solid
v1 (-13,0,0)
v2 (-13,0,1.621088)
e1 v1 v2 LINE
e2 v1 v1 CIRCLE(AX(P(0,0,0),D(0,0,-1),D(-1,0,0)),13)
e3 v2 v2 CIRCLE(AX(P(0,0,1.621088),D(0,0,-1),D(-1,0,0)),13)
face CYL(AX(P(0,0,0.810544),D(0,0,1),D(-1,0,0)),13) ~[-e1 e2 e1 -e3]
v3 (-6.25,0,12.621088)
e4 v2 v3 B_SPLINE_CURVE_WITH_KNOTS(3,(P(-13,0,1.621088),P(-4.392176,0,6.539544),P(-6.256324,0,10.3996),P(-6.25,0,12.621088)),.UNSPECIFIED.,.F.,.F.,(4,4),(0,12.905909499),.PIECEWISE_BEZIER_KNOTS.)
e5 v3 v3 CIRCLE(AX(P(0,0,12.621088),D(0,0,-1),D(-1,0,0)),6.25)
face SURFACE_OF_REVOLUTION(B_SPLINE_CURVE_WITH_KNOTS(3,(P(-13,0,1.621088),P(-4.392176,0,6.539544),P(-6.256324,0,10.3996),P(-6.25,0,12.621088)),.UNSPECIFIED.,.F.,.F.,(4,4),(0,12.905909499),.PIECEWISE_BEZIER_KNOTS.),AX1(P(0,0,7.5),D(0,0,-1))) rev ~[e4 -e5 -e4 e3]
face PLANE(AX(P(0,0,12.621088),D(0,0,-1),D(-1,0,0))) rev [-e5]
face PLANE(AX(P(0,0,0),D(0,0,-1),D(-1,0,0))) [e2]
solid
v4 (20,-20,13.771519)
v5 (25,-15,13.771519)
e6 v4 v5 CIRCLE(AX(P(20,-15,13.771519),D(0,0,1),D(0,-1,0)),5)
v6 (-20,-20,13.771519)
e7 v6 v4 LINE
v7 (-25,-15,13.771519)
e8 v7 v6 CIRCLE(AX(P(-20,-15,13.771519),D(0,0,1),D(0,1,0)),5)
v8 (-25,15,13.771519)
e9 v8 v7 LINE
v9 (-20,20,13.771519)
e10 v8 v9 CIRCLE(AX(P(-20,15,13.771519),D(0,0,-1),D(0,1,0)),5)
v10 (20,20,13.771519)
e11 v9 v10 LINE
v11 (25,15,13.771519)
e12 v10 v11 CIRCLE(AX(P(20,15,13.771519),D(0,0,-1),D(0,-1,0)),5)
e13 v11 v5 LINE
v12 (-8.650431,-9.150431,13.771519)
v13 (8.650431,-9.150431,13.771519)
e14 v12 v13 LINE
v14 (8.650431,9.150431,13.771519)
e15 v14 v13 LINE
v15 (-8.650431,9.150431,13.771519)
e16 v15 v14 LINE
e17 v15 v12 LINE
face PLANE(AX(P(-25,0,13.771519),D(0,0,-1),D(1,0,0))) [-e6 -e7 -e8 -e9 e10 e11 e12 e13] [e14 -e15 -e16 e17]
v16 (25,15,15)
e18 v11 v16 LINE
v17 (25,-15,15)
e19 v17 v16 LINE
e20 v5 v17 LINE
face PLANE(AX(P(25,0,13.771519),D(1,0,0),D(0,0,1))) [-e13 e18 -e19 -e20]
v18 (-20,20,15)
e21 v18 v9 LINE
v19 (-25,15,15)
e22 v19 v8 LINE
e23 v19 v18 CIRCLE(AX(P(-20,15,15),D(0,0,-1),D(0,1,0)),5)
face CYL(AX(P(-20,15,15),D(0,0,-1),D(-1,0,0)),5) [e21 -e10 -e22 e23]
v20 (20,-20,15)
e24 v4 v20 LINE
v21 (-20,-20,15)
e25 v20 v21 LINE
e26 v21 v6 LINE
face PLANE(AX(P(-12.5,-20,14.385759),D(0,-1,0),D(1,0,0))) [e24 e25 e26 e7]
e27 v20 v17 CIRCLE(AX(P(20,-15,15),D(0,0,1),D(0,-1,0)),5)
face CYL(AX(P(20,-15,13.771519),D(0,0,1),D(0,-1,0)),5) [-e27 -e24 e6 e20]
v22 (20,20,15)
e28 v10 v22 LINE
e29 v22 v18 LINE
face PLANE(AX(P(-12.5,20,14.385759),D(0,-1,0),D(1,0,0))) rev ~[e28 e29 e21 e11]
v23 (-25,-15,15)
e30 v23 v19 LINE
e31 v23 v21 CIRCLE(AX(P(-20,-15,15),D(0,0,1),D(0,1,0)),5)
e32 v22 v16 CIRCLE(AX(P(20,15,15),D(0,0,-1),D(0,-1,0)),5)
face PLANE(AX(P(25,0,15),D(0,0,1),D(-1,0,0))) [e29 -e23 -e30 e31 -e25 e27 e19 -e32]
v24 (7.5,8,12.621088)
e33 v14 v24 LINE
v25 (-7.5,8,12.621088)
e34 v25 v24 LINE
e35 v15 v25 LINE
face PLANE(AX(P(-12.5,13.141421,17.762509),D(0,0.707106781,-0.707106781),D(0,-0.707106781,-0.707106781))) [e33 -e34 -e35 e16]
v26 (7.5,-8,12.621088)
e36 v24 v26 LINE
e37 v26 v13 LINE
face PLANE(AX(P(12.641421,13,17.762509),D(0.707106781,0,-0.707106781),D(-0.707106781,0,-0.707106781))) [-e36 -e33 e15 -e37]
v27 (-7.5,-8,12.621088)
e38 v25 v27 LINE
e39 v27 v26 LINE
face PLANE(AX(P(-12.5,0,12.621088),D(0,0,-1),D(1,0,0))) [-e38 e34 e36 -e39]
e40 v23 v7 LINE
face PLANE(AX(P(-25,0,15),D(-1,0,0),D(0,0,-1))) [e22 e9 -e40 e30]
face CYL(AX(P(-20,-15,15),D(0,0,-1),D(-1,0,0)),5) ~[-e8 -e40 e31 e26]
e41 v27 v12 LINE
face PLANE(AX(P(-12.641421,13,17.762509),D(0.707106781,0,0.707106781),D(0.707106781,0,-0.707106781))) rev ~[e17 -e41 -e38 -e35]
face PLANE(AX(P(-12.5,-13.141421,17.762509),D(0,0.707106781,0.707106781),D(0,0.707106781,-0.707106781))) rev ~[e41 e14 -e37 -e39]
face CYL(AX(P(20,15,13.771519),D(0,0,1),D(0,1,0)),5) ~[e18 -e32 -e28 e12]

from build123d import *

# Parameters (mm, degrees)
F1_DEPTH     = 20
F2_DEPTH     = 13
F0_W         = 13
F0_H         = 1.6210880779
F4_T4_DEPTH  = 25
F4_T9_DEPTH  = 26
F4_T14_DEPTH = 26
F4_T19_DEPTH = 25
F4_T25_DEPTH = 38.8584149398
F4_T30_DEPTH = 37.8584149398
F4_T38_DEPTH = 37.8584149398
F4_T43_DEPTH = 38.8584149398
F4_T51_DEPTH = 38.8584149398
F4_T56_DEPTH = 37.8584149398
F4_T64_DEPTH = 38.8584149398
F4_T69_DEPTH = 37.8584149398
F5_R         = 5
F6_R         = 5


# Not quite as in the source:
# - a fillet or chamfer that OpenCascade refuses, or shapes differently, is made with other operations: its cross-section is extruded or revolved along the edge and cut away or added


with BuildPart() as f1:
    # F0 (on Front) → F1 (new body, symmetric)
    with BuildSketch(Plane.XZ):
        Polygon((0, 13.7715186066), (0, 15), (-25, 15), (-25, 13.7715186066), (-12.5, 13.7715186066), align=None)
        Polygon((25, 15), (0, 15), (0, 13.7715186066), (12.5, 13.7715186066), (25, 13.7715186066), align=None)
    extrude(amount=F1_DEPTH, both=True)

    # F0 (on Front) → F2 (join, symmetric)
    with BuildSketch(Plane.XZ):
        Polygon((0, 12.6210880779), (0, 13.7715186066), (-12.5, 13.7715186066), (-12.5, 12.6210880779), (-6.25, 12.6210880779), align=None)
        Polygon((12.5, 13.7715186066), (0, 13.7715186066), (0, 12.6210880779), (6.25, 12.6210880779), (12.5, 12.6210880779), align=None)
    extrude(amount=F2_DEPTH, both=True)

    # F4: chamfer of 5 on 4 edges, made by hand


with BuildPart() as f2:
    # F0 (on Front) → F2, piece 2 (new body, symmetric)
    with BuildSketch(Plane.XZ):
        with Locations((-6.5, 0.810544039)):
            Rectangle(F0_W, F0_H)
        with Locations((6.5, 0.810544039)):
            Rectangle(F0_W, F0_H)
    extrude(amount=F2_DEPTH, both=True)

    # F5
    f5_edges = [f2.edges().sort_by_distance(p)[0] for p in [
        (-13, 13, 0.810544),
        (-13, -13, 0.810544),
        (13, -13, 0.810544),
        (13, 13, 0.810544),
    ]]
    fillet(f5_edges, radius=F5_R)


with BuildPart() as f3:
    # F0 (on Front) → F3 (revolve)
    with BuildSketch(Plane.XZ):
        with BuildLine():
            Line((0, 1.6210880779), (0, 12.6210880779))
            Line((0, 12.6210880779), (-6.25, 12.6210880779))
            add(Edge.make_bspline(
                [(-13, 1.6210880779), (-4.3921764009, 6.5395440906), (-6.2563242824, 10.3996003671), (-6.25, 12.6210880779)],
                knots=[0, 0, 0, 0, 12.9059094991, 12.9059094991, 12.9059094991, 12.9059094991], degree=3))
            Line((-13, 1.6210880779), (0, 1.6210880779))
        make_face()
    revolve(axis=Axis((0, 0, 7.5), (0, 0, -1)))

    # F0 (on Front) → F8 (revolve)
    with BuildSketch(Plane.XZ):
        with Locations((-6.5, 0.810544039)):
            Rectangle(F0_W, F0_H)
    revolve(axis=Axis((0, 0, 0.810544039), (0, 0, -1)))


with BuildPart() as f4_tool2:
    # F4_s3 → F4_t4 (new body)
    with BuildSketch(Plane.YZ.offset(-12.5)):
        with BuildLine():
            Line((13.1414213562, 17.7625094341), (7.8585786438, 12.4796667217))
            Line((7.8585786438, 12.4796667217), (7.8585786438, 12.3796667217))
            ThreePointArc((7.8585786438, 12.3796667217), (10.4292893219, 12.5210880779), (13, 12.5210880779))
            Line((13, 12.5210880779), (13.1, 12.6210880779))
            ThreePointArc((13.1, 12.6210880779), (13.1, 15.191798756), (13.2414213562, 17.7625094341))
            Line((13.2414213562, 17.7625094341), (13.1414213562, 17.7625094341))
        make_face()
    extrude(amount=F4_T4_DEPTH)

    split(bisect_by=Plane.XY.offset(13.7715186066), keep=Keep.BOTTOM)


with BuildPart() as f1_1:
    add(f1.part)

    # F4_t1: cut F4_tool2
    add(f4_tool2.part, mode=Mode.SUBTRACT)


with BuildPart() as f4_tool7:
    # F4_s8 → F4_t9 (new body)
    with BuildSketch(Plane.XZ.offset(-13)):
        with BuildLine():
            Line((-12.6414213562, 17.7625094341), (-7.3585786438, 12.4796667217))
            Line((-7.3585786438, 12.4796667217), (-7.3585786438, 12.3796667217))
            ThreePointArc((-7.3585786438, 12.3796667217), (-9.9292893219, 12.5210880779), (-12.5, 12.5210880779))
            Line((-12.5, 12.5210880779), (-12.6, 12.6210880779))
            ThreePointArc((-12.6, 12.6210880779), (-12.6, 15.191798756), (-12.7414213562, 17.7625094341))
            Line((-12.7414213562, 17.7625094341), (-12.6414213562, 17.7625094341))
        make_face()
    extrude(amount=F4_T9_DEPTH)

    split(bisect_by=Plane.XY.offset(13.7715186066), keep=Keep.BOTTOM)


with BuildPart() as f1_2:
    add(f1_1.part)

    # F4_t6: cut F4_tool7
    add(f4_tool7.part, mode=Mode.SUBTRACT)


with BuildPart() as f4_tool12:
    # F4_s13 → F4_t14 (new body)
    with BuildSketch(Plane.XZ.offset(-13)):
        with BuildLine():
            Line((12.6414213562, 17.7625094341), (7.3585786438, 12.4796667217))
            Line((7.3585786438, 12.4796667217), (7.3585786438, 12.3796667217))
            ThreePointArc((7.3585786438, 12.3796667217), (9.9292893219, 12.5210880779), (12.5, 12.5210880779))
            Line((12.5, 12.5210880779), (12.6, 12.6210880779))
            ThreePointArc((12.6, 12.6210880779), (12.6, 15.191798756), (12.7414213562, 17.7625094341))
            Line((12.7414213562, 17.7625094341), (12.6414213562, 17.7625094341))
        make_face()
    extrude(amount=F4_T14_DEPTH)

    split(bisect_by=Plane.XY.offset(13.7715186066), keep=Keep.BOTTOM)


with BuildPart() as f1_3:
    add(f1_2.part)

    # F4_t11: cut F4_tool12
    add(f4_tool12.part, mode=Mode.SUBTRACT)


with BuildPart() as f4_tool17:
    # F4_s18 → F4_t19 (new body)
    with BuildSketch(Plane.YZ.offset(-12.5)):
        with BuildLine():
            Line((-13.1414213562, 17.7625094341), (-7.8585786438, 12.4796667217))
            Line((-7.8585786438, 12.4796667217), (-7.8585786438, 12.3796667217))
            ThreePointArc((-7.8585786438, 12.3796667217), (-10.4292893219, 12.5210880779), (-13, 12.5210880779))
            Line((-13, 12.5210880779), (-13.1, 12.6210880779))
            ThreePointArc((-13.1, 12.6210880779), (-13.1, 15.191798756), (-13.2414213562, 17.7625094341))
            Line((-13.2414213562, 17.7625094341), (-13.1414213562, 17.7625094341))
        make_face()
    extrude(amount=F4_T19_DEPTH)

    split(bisect_by=Plane.XY.offset(13.7715186066), keep=Keep.BOTTOM)


with BuildPart() as f1_4:
    add(f1_3.part)

    # F4_t16: cut F4_tool17
    add(f4_tool17.part, mode=Mode.SUBTRACT)


with BuildPart() as f4_tool23:
    # F4_s24 → F4_t25 (new body)
    with BuildSketch(Plane.XZ.offset(-25.8584149398)):
        with BuildLine():
            Line((-12.6414213562, 17.7625094341), (-7.3585786438, 12.4796667217))
            Line((-7.3585786438, 12.4796667217), (-7.3585786438, 12.3796667217))
            ThreePointArc((-7.3585786438, 12.3796667217), (-9.9292893219, 12.5210880779), (-12.5, 12.5210880779))
            Line((-12.5, 12.5210880779), (-12.6, 12.6210880779))
            ThreePointArc((-12.6, 12.6210880779), (-12.6, 15.191798756), (-12.7414213562, 17.7625094341))
            Line((-12.7414213562, 17.7625094341), (-12.6414213562, 17.7625094341))
        make_face()
    extrude(amount=F4_T25_DEPTH)

    split(bisect_by=Plane.XY.offset(13.7715186066), keep=Keep.BOTTOM)

    split(bisect_by=Plane.XZ.offset(-13), keep=Keep.BOTTOM)


with BuildPart() as f4_tool28:
    # F4_s29 → F4_t30 (new body)
    with BuildSketch(Plane.YZ.offset(-25.3584149398)):
        with BuildLine():
            Line((13.1414213562, 17.7625094341), (7.8585786438, 12.4796667217))
            Line((7.8585786438, 12.4796667217), (7.8585786438, 12.3796667217))
            ThreePointArc((7.8585786438, 12.3796667217), (10.4292893219, 12.5210880779), (13, 12.5210880779))
            Line((13, 12.5210880779), (13.1, 12.6210880779))
            ThreePointArc((13.1, 12.6210880779), (13.1, 15.191798756), (13.2414213562, 17.7625094341))
            Line((13.2414213562, 17.7625094341), (13.1414213562, 17.7625094341))
        make_face()
    extrude(amount=F4_T30_DEPTH)

    split(bisect_by=Plane.XY.offset(13.7715186066), keep=Keep.BOTTOM)

    split(bisect_by=Plane.YZ.offset(-12.5), keep=Keep.BOTTOM)


with BuildPart() as f4_tool23_1:
    add(f4_tool23.part)

    # F4_t33: intersect F4_tool28
    add(f4_tool28.part, mode=Mode.INTERSECT)


with BuildPart() as f1_5:
    add(f1_4.part)

    # F4_t21: cut F4_tool23
    add(f4_tool23_1.part, mode=Mode.SUBTRACT)


with BuildPart() as f4_tool36:
    # F4_s37 → F4_t38 (new body)
    with BuildSketch(Plane.YZ.offset(-12.5)):
        with BuildLine():
            Line((13.1414213562, 17.7625094341), (7.8585786438, 12.4796667217))
            Line((7.8585786438, 12.4796667217), (7.8585786438, 12.3796667217))
            ThreePointArc((7.8585786438, 12.3796667217), (10.4292893219, 12.5210880779), (13, 12.5210880779))
            Line((13, 12.5210880779), (13.1, 12.6210880779))
            ThreePointArc((13.1, 12.6210880779), (13.1, 15.191798756), (13.2414213562, 17.7625094341))
            Line((13.2414213562, 17.7625094341), (13.1414213562, 17.7625094341))
        make_face()
    extrude(amount=F4_T38_DEPTH)

    split(bisect_by=Plane.XY.offset(13.7715186066), keep=Keep.BOTTOM)

    split(bisect_by=Plane.YZ.offset(12.5), keep=Keep.TOP)


with BuildPart() as f4_tool41:
    # F4_s42 → F4_t43 (new body)
    with BuildSketch(Plane.XZ.offset(-25.8584149398)):
        with BuildLine():
            Line((12.6414213562, 17.7625094341), (7.3585786438, 12.4796667217))
            Line((7.3585786438, 12.4796667217), (7.3585786438, 12.3796667217))
            ThreePointArc((7.3585786438, 12.3796667217), (9.9292893219, 12.5210880779), (12.5, 12.5210880779))
            Line((12.5, 12.5210880779), (12.6, 12.6210880779))
            ThreePointArc((12.6, 12.6210880779), (12.6, 15.191798756), (12.7414213562, 17.7625094341))
            Line((12.7414213562, 17.7625094341), (12.6414213562, 17.7625094341))
        make_face()
    extrude(amount=F4_T43_DEPTH)

    split(bisect_by=Plane.XY.offset(13.7715186066), keep=Keep.BOTTOM)

    split(bisect_by=Plane.XZ.offset(-13), keep=Keep.BOTTOM)


with BuildPart() as f4_tool36_1:
    add(f4_tool36.part)

    # F4_t46: intersect F4_tool41
    add(f4_tool41.part, mode=Mode.INTERSECT)


with BuildPart() as f1_6:
    add(f1_5.part)

    # F4_t34: cut F4_tool36
    add(f4_tool36_1.part, mode=Mode.SUBTRACT)


with BuildPart() as f4_tool49:
    # F4_s50 → F4_t51 (new body)
    with BuildSketch(Plane.XZ.offset(-13)):
        with BuildLine():
            Line((-12.6414213562, 17.7625094341), (-7.3585786438, 12.4796667217))
            Line((-7.3585786438, 12.4796667217), (-7.3585786438, 12.3796667217))
            ThreePointArc((-7.3585786438, 12.3796667217), (-9.9292893219, 12.5210880779), (-12.5, 12.5210880779))
            Line((-12.5, 12.5210880779), (-12.6, 12.6210880779))
            ThreePointArc((-12.6, 12.6210880779), (-12.6, 15.191798756), (-12.7414213562, 17.7625094341))
            Line((-12.7414213562, 17.7625094341), (-12.6414213562, 17.7625094341))
        make_face()
    extrude(amount=F4_T51_DEPTH)

    split(bisect_by=Plane.XY.offset(13.7715186066), keep=Keep.BOTTOM)

    split(bisect_by=Plane.XZ.offset(13), keep=Keep.TOP)


with BuildPart() as f4_tool54:
    # F4_s55 → F4_t56 (new body)
    with BuildSketch(Plane.YZ.offset(-25.3584149398)):
        with BuildLine():
            Line((-13.1414213562, 17.7625094341), (-7.8585786438, 12.4796667217))
            Line((-7.8585786438, 12.4796667217), (-7.8585786438, 12.3796667217))
            ThreePointArc((-7.8585786438, 12.3796667217), (-10.4292893219, 12.5210880779), (-13, 12.5210880779))
            Line((-13, 12.5210880779), (-13.1, 12.6210880779))
            ThreePointArc((-13.1, 12.6210880779), (-13.1, 15.191798756), (-13.2414213562, 17.7625094341))
            Line((-13.2414213562, 17.7625094341), (-13.1414213562, 17.7625094341))
        make_face()
    extrude(amount=F4_T56_DEPTH)

    split(bisect_by=Plane.XY.offset(13.7715186066), keep=Keep.BOTTOM)

    split(bisect_by=Plane.YZ.offset(-12.5), keep=Keep.BOTTOM)


with BuildPart() as f4_tool49_1:
    add(f4_tool49.part)

    # F4_t59: intersect F4_tool54
    add(f4_tool54.part, mode=Mode.INTERSECT)


with BuildPart() as f1_7:
    add(f1_6.part)

    # F4_t47: cut F4_tool49
    add(f4_tool49_1.part, mode=Mode.SUBTRACT)


with BuildPart() as f4_tool62:
    # F4_s63 → F4_t64 (new body)
    with BuildSketch(Plane.XZ.offset(-13)):
        with BuildLine():
            Line((12.6414213562, 17.7625094341), (7.3585786438, 12.4796667217))
            Line((7.3585786438, 12.4796667217), (7.3585786438, 12.3796667217))
            ThreePointArc((7.3585786438, 12.3796667217), (9.9292893219, 12.5210880779), (12.5, 12.5210880779))
            Line((12.5, 12.5210880779), (12.6, 12.6210880779))
            ThreePointArc((12.6, 12.6210880779), (12.6, 15.191798756), (12.7414213562, 17.7625094341))
            Line((12.7414213562, 17.7625094341), (12.6414213562, 17.7625094341))
        make_face()
    extrude(amount=F4_T64_DEPTH)

    split(bisect_by=Plane.XY.offset(13.7715186066), keep=Keep.BOTTOM)

    split(bisect_by=Plane.XZ.offset(13), keep=Keep.TOP)


with BuildPart() as f4_tool67:
    # F4_s68 → F4_t69 (new body)
    with BuildSketch(Plane.YZ.offset(-12.5)):
        with BuildLine():
            Line((-13.1414213562, 17.7625094341), (-7.8585786438, 12.4796667217))
            Line((-7.8585786438, 12.4796667217), (-7.8585786438, 12.3796667217))
            ThreePointArc((-7.8585786438, 12.3796667217), (-10.4292893219, 12.5210880779), (-13, 12.5210880779))
            Line((-13, 12.5210880779), (-13.1, 12.6210880779))
            ThreePointArc((-13.1, 12.6210880779), (-13.1, 15.191798756), (-13.2414213562, 17.7625094341))
            Line((-13.2414213562, 17.7625094341), (-13.1414213562, 17.7625094341))
        make_face()
    extrude(amount=F4_T69_DEPTH)

    split(bisect_by=Plane.XY.offset(13.7715186066), keep=Keep.BOTTOM)

    split(bisect_by=Plane.YZ.offset(12.5), keep=Keep.TOP)


with BuildPart() as f4_tool62_1:
    add(f4_tool62.part)

    # F4_t72: intersect F4_tool67
    add(f4_tool67.part, mode=Mode.INTERSECT)


with BuildPart() as f1_8:
    add(f1_7.part)

    # F4_t60: cut F4_tool62
    add(f4_tool62_1.part, mode=Mode.SUBTRACT)

    # F6
    f6_edges = [f1_8.edges().sort_by_distance(p)[0] for p in [
        (-25, -20, 14.385759),
        (-25, 20, 14.385759),
        (25, -20, 14.385759),
        (25, 20, 14.385759),
    ]]
    fillet(f6_edges, radius=F6_R)


solid = Compound([f3.part, f1_8.part])
